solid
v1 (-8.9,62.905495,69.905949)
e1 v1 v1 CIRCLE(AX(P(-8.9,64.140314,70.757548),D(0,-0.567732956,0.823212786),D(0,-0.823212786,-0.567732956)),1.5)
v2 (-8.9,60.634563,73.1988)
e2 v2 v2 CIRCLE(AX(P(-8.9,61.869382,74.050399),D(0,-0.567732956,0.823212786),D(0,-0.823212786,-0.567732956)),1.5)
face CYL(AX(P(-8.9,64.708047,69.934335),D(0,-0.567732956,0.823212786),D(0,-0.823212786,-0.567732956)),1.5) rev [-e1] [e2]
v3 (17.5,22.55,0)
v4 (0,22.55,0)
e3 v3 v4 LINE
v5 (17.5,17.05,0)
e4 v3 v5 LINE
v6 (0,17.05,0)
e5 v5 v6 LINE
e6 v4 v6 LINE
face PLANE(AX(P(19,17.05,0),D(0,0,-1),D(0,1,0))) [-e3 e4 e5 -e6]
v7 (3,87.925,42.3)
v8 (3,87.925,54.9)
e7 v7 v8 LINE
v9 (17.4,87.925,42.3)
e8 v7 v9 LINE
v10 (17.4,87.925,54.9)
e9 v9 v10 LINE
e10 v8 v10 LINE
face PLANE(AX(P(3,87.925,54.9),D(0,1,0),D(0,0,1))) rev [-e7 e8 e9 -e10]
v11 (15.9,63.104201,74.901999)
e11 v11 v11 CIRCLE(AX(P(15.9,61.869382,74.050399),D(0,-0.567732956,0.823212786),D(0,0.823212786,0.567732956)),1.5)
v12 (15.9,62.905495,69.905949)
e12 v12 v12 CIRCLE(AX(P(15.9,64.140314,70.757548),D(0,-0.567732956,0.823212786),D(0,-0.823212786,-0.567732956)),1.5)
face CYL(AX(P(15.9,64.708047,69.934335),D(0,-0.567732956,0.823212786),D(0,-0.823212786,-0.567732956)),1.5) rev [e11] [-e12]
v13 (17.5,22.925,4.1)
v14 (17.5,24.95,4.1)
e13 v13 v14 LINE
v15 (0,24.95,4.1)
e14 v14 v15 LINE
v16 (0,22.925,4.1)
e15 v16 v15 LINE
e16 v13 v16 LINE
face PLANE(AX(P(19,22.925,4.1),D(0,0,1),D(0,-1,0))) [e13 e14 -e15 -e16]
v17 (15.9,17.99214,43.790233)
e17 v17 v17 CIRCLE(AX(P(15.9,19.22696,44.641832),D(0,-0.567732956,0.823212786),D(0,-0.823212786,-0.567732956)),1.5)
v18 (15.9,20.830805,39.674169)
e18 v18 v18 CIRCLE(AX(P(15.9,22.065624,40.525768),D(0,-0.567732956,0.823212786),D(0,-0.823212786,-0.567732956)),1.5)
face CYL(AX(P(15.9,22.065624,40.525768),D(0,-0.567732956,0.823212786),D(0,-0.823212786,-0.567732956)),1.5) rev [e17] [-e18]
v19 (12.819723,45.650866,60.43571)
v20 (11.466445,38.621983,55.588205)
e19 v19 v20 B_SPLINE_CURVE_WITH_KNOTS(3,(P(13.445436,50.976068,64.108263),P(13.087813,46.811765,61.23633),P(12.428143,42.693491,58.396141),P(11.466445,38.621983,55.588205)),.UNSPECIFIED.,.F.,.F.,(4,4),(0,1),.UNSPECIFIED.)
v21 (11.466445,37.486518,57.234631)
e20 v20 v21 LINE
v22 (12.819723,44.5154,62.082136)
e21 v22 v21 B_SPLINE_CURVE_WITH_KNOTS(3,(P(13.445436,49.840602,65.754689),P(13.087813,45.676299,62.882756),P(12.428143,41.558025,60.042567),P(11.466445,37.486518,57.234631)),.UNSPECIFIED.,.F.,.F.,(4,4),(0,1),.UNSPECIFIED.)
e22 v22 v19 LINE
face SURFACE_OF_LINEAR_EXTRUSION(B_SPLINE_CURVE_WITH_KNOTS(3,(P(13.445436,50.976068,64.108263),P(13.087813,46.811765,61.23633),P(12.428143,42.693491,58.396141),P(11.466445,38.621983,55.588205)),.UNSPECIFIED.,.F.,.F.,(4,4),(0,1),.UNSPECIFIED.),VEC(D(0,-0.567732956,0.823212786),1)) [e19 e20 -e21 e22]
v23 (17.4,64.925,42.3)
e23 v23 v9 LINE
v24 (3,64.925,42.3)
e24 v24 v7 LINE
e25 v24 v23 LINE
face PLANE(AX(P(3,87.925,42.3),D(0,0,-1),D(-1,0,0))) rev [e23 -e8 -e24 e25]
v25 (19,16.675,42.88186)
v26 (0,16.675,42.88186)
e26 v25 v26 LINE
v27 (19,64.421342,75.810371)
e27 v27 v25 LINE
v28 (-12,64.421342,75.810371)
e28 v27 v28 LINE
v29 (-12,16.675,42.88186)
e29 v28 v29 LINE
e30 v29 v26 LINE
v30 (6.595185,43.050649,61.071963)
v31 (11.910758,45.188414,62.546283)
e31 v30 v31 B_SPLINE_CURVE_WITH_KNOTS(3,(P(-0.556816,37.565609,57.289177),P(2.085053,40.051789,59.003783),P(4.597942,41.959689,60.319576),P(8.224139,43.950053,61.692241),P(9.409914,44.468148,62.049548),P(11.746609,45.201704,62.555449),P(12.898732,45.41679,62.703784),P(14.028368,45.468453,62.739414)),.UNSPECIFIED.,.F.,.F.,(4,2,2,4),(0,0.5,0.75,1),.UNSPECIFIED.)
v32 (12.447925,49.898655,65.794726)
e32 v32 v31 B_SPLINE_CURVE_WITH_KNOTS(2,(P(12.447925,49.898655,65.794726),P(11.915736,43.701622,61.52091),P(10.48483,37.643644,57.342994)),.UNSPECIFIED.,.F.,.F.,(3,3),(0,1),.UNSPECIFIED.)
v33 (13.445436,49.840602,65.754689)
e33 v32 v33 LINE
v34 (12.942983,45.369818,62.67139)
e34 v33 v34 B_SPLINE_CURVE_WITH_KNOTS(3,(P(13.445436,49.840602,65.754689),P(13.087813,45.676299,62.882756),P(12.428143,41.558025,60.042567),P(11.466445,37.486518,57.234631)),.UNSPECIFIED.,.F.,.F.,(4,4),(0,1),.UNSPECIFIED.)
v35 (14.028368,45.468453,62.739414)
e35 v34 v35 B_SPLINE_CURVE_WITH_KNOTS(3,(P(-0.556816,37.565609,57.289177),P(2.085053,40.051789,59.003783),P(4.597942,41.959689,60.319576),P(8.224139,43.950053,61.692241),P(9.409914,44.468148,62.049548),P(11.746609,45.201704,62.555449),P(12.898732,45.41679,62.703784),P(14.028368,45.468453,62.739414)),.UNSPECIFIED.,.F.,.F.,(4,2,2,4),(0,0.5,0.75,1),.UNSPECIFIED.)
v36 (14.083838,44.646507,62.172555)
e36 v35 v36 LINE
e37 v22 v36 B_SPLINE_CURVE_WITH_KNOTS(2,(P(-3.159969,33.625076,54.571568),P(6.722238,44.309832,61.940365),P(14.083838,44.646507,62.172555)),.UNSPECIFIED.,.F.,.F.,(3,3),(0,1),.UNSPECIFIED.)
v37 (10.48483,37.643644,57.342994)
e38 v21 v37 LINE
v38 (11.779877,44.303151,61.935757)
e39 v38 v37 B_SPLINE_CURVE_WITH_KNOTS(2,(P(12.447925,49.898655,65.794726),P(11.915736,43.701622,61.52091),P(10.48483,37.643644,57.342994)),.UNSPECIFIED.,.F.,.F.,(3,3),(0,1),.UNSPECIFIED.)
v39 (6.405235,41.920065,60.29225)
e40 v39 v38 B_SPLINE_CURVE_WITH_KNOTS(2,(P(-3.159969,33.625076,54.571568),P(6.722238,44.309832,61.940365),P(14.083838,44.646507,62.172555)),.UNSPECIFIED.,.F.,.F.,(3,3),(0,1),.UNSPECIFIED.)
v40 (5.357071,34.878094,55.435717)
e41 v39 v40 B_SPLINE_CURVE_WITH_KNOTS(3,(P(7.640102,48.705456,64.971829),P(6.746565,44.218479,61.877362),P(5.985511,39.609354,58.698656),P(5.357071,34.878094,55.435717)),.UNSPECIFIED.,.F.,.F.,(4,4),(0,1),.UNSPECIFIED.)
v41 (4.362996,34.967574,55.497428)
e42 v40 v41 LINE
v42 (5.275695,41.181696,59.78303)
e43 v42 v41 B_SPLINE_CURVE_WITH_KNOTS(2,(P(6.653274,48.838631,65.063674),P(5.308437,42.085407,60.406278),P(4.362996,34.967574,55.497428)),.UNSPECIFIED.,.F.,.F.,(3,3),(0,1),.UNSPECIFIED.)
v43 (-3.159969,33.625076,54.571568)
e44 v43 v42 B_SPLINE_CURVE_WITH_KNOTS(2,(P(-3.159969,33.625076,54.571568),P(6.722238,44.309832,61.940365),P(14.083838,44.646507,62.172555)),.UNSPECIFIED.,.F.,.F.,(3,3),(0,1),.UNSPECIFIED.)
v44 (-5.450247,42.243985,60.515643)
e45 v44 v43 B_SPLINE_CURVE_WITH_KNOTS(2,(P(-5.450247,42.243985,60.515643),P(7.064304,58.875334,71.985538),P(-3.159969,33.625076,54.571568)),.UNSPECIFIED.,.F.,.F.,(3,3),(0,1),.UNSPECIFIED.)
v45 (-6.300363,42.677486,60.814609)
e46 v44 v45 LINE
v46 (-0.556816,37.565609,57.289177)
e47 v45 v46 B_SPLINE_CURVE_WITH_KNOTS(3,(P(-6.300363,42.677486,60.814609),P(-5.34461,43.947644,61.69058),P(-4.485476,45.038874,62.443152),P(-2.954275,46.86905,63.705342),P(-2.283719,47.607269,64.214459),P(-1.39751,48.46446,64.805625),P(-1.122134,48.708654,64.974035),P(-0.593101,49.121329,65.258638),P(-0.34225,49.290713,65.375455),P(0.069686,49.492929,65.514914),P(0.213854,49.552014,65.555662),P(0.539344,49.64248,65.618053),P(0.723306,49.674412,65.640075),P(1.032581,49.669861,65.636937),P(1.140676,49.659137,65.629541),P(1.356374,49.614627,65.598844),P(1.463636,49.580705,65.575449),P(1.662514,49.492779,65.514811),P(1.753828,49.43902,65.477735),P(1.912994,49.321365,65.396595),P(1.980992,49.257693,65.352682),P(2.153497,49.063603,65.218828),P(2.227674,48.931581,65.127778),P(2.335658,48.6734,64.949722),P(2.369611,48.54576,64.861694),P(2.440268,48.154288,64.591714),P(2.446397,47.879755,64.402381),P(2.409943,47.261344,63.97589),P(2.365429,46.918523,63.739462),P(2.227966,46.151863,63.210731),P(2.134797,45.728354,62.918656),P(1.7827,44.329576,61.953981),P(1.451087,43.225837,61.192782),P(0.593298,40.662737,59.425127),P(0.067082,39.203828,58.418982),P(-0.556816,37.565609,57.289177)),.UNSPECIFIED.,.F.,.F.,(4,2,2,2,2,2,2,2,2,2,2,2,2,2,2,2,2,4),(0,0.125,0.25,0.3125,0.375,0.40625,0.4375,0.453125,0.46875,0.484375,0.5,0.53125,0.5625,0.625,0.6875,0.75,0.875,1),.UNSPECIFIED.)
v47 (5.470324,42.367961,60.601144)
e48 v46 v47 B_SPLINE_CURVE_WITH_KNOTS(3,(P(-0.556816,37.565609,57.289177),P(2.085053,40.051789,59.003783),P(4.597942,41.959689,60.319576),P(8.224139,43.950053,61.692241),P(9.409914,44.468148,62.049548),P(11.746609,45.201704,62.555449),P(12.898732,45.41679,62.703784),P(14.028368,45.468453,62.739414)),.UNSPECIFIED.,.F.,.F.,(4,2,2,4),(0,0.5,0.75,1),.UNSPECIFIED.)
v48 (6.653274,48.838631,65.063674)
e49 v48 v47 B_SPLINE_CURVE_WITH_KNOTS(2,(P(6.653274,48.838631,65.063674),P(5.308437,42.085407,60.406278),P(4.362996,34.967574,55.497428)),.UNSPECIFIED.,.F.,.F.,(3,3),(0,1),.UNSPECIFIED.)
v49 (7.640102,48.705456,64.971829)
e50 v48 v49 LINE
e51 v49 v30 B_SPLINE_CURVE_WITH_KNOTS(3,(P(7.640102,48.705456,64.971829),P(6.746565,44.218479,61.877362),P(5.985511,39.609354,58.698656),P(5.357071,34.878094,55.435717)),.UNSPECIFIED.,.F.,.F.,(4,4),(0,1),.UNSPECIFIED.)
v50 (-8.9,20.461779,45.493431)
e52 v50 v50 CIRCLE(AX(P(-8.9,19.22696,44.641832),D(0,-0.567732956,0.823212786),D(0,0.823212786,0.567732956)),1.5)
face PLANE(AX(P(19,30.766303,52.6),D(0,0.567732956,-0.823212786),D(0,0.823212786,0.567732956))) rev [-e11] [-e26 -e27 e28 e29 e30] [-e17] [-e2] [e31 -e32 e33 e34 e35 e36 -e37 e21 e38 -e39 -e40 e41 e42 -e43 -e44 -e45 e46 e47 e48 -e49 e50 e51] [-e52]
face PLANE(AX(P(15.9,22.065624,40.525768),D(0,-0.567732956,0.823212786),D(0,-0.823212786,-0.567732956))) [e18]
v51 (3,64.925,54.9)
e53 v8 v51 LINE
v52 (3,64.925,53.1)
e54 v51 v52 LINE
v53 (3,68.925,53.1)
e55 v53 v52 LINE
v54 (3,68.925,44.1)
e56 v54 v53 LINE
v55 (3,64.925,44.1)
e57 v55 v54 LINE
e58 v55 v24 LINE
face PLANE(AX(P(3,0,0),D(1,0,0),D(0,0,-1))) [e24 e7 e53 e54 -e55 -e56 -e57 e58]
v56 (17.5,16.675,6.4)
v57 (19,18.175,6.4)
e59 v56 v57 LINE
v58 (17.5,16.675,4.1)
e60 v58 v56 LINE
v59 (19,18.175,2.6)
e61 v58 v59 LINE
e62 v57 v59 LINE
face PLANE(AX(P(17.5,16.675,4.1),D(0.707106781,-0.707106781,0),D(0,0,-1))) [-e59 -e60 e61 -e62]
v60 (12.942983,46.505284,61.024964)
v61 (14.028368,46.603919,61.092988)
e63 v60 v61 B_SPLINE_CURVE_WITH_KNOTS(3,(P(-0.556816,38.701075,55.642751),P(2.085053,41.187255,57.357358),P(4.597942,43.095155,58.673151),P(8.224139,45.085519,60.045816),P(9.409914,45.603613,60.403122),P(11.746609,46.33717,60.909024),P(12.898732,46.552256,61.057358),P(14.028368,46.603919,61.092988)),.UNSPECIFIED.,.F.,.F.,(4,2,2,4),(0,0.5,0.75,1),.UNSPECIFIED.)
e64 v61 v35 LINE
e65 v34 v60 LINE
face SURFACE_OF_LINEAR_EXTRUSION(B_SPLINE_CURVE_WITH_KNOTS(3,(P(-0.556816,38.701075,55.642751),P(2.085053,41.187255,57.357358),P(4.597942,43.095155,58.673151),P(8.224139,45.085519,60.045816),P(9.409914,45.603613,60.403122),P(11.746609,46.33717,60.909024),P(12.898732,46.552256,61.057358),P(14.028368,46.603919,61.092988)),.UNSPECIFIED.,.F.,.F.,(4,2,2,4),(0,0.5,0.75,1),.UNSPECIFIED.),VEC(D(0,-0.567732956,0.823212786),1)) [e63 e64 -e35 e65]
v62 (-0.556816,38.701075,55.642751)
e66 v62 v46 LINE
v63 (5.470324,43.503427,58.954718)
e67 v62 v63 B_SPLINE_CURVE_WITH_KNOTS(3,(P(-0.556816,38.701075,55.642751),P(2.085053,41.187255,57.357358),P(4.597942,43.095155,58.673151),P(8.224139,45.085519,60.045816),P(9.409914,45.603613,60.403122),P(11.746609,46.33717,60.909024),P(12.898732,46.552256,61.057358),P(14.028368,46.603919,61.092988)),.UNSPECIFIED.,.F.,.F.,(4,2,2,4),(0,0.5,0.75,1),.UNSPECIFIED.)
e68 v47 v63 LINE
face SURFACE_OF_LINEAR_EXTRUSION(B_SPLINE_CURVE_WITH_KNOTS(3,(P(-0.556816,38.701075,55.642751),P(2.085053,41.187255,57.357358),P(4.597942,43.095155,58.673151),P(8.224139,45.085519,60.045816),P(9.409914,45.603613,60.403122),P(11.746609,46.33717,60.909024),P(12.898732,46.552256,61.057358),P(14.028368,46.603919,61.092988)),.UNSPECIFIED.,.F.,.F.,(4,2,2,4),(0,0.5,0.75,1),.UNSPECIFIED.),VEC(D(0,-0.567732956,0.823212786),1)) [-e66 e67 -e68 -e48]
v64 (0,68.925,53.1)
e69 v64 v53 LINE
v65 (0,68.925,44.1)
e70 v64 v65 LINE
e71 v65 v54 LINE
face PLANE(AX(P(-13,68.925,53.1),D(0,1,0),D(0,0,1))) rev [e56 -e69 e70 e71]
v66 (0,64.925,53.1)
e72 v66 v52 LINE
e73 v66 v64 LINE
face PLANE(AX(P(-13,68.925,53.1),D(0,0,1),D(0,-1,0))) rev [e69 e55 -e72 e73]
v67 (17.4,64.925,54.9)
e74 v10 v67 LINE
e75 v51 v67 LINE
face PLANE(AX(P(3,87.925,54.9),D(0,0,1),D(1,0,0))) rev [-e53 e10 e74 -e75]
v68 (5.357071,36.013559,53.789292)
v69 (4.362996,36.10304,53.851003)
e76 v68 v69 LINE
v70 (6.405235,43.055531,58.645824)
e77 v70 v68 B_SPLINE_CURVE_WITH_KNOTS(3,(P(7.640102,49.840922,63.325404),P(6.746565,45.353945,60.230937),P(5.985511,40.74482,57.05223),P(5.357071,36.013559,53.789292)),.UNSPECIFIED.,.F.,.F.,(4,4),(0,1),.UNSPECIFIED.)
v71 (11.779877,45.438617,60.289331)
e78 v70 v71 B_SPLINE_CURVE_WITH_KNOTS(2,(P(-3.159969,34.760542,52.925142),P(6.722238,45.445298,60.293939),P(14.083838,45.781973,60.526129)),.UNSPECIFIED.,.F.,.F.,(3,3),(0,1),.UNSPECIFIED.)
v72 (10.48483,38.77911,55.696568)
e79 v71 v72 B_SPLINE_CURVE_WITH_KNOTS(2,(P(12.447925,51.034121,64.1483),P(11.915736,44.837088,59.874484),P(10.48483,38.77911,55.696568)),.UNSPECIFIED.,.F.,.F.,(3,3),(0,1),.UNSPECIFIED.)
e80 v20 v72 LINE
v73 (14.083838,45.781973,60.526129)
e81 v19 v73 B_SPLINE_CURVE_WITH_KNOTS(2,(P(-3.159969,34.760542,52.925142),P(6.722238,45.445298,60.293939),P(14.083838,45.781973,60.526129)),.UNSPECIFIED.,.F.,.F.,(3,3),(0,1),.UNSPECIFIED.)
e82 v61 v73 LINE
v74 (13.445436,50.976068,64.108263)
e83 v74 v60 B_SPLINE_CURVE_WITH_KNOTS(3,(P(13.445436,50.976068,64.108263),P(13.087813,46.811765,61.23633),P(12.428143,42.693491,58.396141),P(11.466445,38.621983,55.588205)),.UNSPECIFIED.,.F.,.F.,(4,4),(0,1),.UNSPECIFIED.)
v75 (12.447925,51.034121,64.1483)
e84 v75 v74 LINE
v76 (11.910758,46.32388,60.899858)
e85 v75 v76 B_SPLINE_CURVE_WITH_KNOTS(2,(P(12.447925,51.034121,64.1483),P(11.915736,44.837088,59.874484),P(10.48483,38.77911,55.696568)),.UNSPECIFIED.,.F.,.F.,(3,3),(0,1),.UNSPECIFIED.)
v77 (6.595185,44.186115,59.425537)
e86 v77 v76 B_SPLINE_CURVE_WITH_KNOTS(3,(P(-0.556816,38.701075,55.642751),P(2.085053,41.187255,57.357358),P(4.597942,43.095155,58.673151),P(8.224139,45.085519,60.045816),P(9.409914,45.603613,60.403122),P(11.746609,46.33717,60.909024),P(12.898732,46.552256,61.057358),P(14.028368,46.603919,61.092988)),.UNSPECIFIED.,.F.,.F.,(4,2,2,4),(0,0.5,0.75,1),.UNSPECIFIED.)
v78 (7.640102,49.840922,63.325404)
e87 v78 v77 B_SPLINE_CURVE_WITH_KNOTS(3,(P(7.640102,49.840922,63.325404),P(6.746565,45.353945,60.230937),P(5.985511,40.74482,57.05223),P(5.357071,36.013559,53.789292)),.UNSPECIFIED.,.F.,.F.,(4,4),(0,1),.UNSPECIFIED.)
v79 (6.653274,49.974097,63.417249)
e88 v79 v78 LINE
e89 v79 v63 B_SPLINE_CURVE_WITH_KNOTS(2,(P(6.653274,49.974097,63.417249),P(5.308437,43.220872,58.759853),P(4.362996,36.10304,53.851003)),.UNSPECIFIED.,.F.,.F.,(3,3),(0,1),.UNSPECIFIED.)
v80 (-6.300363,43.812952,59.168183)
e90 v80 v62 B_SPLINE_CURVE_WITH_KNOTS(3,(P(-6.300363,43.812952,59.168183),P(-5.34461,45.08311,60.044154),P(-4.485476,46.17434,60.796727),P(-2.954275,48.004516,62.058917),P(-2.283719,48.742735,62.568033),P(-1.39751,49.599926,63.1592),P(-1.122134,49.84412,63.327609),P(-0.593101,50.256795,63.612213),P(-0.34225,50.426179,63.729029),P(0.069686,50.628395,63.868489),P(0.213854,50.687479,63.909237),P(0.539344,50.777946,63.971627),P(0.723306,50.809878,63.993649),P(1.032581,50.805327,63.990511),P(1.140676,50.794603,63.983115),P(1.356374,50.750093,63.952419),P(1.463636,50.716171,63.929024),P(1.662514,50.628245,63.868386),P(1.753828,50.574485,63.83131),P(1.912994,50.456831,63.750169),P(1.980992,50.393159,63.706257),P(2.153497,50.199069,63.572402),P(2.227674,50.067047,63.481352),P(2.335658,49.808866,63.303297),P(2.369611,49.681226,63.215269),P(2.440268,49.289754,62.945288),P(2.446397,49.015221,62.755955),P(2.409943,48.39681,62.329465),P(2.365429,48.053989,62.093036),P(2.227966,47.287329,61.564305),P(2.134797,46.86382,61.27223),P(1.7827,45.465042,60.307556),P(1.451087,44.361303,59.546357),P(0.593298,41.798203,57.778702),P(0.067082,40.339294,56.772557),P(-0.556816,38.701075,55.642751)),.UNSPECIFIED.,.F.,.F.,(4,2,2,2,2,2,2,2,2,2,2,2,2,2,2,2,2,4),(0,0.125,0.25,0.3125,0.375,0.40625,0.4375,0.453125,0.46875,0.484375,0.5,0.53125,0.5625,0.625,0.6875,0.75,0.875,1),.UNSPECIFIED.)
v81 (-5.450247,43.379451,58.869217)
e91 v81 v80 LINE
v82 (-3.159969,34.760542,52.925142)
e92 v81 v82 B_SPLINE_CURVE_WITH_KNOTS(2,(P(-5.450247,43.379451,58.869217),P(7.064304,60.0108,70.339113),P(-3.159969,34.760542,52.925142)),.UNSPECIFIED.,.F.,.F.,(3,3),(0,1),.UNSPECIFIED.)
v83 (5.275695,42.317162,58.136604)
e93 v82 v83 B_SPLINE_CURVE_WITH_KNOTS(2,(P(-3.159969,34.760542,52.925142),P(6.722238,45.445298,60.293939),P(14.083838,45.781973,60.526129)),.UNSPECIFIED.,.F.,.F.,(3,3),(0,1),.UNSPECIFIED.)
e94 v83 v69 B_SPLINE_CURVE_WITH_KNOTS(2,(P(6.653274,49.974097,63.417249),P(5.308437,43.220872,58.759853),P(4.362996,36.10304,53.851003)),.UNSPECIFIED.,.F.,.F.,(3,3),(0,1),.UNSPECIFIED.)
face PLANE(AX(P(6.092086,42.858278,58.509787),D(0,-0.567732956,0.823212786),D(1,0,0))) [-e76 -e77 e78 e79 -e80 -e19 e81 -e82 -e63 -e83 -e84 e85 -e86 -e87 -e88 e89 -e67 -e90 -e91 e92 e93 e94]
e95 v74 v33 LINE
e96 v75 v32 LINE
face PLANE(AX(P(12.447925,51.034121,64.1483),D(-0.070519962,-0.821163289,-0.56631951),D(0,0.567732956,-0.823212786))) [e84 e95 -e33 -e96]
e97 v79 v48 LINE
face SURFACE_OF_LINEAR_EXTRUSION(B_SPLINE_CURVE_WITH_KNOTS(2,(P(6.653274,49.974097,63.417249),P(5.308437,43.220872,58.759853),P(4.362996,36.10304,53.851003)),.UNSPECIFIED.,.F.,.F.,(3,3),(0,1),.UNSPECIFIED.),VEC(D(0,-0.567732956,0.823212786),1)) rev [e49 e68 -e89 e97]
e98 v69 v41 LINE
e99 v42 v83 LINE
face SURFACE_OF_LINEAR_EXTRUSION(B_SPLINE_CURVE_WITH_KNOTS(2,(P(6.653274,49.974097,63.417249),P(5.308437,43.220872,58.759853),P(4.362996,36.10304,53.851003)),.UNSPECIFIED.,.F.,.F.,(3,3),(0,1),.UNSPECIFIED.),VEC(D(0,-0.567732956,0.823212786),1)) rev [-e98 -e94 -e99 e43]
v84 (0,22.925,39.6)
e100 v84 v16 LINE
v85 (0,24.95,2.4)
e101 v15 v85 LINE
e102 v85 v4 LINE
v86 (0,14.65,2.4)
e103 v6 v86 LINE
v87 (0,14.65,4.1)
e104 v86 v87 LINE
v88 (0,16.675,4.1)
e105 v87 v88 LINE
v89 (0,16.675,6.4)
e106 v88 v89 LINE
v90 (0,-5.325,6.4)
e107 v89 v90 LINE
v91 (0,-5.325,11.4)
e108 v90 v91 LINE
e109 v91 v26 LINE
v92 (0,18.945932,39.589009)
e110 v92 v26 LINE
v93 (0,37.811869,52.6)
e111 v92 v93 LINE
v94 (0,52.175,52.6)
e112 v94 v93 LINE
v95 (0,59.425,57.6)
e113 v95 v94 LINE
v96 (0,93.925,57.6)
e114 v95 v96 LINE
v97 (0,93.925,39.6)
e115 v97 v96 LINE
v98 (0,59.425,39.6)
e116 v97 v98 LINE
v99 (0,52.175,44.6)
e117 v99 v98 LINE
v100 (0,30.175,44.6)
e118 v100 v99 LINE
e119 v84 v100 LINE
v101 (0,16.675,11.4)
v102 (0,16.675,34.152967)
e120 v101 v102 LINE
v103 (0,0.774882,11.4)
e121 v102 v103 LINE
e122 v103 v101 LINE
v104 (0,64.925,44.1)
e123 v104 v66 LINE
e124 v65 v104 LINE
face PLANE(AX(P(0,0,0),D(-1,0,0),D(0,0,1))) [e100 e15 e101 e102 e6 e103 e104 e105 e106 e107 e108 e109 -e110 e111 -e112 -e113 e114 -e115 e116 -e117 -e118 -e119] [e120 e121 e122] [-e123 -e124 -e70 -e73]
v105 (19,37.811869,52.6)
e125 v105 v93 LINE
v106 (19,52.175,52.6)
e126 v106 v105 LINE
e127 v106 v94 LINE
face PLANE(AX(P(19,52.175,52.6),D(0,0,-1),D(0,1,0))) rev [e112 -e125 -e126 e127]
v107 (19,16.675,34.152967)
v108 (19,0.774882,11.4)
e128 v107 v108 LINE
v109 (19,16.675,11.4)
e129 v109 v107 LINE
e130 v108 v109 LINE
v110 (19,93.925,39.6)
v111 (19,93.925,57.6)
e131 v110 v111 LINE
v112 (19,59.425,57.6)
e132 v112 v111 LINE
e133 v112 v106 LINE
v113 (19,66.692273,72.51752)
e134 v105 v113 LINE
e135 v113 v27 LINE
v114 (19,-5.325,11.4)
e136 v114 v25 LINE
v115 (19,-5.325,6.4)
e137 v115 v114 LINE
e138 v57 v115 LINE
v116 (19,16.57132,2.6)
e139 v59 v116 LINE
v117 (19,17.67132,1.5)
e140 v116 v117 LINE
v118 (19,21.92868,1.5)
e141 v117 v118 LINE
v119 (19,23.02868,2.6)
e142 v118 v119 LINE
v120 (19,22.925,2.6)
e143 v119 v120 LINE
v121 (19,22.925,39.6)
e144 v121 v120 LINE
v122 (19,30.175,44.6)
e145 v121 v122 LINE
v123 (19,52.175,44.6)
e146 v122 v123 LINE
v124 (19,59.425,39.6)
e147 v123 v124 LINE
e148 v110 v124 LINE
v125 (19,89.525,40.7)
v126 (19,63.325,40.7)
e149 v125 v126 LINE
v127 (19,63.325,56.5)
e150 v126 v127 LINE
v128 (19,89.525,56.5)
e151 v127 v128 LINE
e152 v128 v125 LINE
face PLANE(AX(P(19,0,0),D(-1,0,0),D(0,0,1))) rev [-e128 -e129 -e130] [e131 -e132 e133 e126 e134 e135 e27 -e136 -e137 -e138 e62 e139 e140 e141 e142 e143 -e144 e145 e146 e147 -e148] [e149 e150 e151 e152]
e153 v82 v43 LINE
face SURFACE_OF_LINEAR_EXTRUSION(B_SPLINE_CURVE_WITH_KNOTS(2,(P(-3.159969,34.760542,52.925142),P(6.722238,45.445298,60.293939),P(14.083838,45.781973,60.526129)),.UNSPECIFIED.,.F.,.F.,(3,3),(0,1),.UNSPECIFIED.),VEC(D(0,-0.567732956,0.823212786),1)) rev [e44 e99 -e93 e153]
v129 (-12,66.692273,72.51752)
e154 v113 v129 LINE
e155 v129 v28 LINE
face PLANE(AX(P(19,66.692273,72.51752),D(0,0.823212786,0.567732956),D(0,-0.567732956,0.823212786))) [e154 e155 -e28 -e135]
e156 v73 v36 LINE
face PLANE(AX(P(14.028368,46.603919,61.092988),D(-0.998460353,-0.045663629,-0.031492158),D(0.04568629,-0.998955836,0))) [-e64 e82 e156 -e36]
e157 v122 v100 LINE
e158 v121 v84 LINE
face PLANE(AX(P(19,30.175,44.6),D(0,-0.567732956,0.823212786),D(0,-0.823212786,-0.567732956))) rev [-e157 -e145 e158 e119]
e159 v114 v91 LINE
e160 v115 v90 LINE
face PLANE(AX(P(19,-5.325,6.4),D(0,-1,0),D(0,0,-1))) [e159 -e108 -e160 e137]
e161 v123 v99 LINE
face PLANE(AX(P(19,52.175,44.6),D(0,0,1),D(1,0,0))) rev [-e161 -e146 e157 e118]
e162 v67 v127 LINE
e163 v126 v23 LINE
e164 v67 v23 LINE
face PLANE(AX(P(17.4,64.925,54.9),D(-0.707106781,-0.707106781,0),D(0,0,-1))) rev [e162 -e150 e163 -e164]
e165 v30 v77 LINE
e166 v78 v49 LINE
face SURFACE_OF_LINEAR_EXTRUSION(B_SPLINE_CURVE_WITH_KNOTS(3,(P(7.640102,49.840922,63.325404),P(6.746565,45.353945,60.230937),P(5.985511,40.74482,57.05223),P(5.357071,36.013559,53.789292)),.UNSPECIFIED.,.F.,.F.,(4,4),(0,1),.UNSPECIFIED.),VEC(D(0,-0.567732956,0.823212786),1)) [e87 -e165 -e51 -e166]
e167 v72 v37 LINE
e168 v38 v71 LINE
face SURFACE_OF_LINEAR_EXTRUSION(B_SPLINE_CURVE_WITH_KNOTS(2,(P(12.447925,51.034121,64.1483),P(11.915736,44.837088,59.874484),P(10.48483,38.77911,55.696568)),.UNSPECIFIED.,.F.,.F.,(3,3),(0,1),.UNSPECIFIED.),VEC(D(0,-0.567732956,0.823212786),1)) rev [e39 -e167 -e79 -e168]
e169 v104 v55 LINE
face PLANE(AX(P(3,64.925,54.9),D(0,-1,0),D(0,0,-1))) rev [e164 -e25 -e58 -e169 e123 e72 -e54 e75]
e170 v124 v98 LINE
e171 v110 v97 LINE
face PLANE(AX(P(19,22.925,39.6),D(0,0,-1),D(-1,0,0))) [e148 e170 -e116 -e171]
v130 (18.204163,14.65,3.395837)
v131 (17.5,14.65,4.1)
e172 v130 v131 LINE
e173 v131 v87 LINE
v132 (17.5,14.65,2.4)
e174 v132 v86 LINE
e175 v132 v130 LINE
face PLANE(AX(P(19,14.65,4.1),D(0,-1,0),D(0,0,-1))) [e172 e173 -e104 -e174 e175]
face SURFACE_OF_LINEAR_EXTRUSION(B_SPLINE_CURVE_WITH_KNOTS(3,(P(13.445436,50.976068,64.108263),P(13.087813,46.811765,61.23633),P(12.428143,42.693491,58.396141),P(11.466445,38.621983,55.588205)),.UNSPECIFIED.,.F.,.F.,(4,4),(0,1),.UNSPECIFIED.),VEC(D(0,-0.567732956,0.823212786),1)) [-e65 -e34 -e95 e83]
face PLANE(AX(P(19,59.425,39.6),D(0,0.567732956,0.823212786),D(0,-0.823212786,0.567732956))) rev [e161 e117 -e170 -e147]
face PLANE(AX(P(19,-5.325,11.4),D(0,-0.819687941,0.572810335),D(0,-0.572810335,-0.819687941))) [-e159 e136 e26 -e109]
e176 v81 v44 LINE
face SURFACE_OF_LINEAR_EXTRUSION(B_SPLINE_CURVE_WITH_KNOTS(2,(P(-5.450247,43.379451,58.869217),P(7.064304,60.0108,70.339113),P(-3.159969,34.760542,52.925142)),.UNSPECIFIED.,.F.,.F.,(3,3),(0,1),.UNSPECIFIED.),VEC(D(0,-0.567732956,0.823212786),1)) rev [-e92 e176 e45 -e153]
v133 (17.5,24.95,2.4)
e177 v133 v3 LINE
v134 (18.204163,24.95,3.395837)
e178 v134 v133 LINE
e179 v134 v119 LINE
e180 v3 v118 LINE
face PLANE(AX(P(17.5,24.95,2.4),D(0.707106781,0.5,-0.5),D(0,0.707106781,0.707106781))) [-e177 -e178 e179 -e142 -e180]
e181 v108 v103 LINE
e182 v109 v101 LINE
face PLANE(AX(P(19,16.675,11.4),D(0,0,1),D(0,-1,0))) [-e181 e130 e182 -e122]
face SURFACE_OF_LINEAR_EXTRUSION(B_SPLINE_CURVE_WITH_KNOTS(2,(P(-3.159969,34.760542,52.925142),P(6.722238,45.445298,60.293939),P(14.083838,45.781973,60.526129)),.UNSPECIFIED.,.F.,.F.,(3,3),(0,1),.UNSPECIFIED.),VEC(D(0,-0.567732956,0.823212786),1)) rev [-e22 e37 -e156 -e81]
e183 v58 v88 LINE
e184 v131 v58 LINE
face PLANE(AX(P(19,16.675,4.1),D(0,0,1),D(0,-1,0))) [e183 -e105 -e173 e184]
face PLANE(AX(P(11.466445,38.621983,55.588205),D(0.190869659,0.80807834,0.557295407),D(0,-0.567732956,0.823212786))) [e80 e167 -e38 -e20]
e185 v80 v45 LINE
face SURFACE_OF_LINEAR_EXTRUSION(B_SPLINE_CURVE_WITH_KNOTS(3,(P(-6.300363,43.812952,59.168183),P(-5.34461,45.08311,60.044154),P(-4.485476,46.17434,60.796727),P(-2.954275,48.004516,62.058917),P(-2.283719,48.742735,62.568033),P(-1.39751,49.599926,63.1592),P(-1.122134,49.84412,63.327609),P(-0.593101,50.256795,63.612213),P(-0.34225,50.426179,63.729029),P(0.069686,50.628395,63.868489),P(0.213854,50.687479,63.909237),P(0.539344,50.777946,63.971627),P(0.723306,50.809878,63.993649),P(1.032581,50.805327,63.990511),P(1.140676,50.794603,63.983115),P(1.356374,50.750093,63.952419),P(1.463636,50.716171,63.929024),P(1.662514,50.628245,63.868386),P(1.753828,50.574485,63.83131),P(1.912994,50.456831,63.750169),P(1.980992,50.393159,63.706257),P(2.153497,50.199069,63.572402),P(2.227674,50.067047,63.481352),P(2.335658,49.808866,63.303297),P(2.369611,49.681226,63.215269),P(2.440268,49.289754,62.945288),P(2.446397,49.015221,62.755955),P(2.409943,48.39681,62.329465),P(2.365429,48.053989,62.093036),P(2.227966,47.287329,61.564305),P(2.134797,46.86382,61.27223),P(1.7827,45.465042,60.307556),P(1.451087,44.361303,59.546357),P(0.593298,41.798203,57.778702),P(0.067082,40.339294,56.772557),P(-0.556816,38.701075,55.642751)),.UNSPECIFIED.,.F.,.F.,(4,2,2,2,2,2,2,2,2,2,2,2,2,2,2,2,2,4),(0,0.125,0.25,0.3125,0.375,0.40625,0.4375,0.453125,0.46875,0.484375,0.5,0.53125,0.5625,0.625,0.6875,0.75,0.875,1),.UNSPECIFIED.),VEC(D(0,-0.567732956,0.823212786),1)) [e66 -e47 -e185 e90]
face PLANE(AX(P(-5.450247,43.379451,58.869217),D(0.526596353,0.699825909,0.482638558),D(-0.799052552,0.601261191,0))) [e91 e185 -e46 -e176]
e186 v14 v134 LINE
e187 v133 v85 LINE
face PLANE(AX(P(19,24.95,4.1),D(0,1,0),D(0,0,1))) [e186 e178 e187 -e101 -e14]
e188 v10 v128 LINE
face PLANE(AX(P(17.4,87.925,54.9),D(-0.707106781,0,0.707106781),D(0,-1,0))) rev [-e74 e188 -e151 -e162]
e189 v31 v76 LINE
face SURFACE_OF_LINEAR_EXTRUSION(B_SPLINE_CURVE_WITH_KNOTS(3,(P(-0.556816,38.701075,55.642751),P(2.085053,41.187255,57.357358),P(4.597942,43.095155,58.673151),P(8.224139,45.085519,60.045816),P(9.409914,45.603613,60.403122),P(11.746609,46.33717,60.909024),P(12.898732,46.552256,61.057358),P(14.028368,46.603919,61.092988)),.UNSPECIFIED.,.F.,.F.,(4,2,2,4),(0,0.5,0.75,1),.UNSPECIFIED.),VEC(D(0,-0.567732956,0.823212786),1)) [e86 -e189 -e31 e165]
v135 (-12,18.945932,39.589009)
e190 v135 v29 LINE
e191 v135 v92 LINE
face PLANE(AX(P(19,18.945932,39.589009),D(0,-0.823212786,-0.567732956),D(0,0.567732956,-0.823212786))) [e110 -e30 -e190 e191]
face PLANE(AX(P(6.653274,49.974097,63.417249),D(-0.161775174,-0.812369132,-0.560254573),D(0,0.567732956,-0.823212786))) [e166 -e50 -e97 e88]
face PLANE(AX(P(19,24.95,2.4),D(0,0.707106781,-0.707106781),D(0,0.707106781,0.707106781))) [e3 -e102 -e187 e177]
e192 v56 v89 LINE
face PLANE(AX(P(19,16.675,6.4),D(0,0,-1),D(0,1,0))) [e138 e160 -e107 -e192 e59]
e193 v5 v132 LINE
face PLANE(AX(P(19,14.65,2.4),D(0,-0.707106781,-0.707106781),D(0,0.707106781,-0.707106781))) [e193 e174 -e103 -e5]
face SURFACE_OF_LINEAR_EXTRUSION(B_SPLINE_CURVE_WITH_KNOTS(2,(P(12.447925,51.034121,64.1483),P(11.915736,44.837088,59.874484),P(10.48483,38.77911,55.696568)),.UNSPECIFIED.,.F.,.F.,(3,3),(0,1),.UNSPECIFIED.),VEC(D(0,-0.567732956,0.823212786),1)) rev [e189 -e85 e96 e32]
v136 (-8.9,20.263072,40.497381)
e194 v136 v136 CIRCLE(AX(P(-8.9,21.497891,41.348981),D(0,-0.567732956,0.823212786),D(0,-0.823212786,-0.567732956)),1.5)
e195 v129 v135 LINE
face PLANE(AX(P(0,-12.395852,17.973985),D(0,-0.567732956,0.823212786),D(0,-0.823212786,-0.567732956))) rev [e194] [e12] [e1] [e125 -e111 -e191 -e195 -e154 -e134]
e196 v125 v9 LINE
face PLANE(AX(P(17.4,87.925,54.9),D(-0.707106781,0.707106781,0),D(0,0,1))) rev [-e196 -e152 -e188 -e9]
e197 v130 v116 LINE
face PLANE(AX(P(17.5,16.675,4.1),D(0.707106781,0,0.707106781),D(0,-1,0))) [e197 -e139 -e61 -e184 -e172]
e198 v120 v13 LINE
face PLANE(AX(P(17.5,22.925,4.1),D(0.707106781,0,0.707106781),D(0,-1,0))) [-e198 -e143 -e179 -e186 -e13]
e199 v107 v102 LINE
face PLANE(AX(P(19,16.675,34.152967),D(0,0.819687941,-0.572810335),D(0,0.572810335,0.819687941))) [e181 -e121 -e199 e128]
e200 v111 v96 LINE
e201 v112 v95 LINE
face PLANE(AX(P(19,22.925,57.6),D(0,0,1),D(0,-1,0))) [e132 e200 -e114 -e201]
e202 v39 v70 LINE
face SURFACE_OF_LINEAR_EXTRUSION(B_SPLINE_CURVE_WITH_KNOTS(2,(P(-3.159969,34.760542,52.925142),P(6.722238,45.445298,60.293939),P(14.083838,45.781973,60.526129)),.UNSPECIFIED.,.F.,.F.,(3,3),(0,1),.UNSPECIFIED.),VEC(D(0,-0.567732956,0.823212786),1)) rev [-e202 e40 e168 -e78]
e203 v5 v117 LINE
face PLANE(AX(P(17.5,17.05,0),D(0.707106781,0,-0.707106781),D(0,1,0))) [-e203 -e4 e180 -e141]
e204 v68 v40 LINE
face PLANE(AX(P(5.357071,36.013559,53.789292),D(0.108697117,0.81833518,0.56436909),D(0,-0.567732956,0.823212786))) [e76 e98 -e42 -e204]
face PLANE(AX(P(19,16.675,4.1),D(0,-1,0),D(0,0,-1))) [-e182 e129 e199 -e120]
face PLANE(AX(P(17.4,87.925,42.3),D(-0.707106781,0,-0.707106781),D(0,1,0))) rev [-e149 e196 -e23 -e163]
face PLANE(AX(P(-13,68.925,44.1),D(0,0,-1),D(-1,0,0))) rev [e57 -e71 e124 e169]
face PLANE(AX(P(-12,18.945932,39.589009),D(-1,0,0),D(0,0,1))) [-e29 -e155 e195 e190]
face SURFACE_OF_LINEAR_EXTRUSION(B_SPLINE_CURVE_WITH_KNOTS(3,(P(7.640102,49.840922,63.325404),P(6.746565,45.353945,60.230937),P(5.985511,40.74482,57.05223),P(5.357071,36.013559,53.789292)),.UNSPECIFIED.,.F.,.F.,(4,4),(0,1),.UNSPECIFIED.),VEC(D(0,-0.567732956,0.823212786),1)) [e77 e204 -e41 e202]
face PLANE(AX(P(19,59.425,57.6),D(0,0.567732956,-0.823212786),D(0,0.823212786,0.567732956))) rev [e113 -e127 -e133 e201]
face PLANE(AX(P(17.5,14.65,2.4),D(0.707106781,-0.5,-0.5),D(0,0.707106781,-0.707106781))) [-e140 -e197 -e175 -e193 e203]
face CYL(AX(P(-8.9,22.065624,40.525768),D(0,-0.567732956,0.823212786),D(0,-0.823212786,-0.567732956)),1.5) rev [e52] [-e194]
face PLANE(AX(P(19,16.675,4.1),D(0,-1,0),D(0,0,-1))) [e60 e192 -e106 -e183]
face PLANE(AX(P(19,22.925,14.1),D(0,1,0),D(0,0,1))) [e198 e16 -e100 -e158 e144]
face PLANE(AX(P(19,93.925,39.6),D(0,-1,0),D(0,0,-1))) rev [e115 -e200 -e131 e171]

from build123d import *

# Parameters (mm, degrees)
BOSS_EXTRUDE1_DEPTH     = 19
SKETCH3_W               = 5.025645198
SKETCH3_H               = 33.799871634
BOSS_EXTRUDE2_DEPTH     = 19
SKETCH4_W               = 5.025645198
SKETCH4_H               = 7.749871634
CUT_EXTRUDE1_DEPTH      = 41.8379487
SKETCH5_W               = 11.025645198
SKETCH5_H               = 26.05
CUT_EXTRUDE3_DEPTH      = 37.732721166
SKETCH6_W               = 40.5
SKETCH6_H               = 6.25
BOSS_EXTRUDE3_DEPTH     = 19
SKETCH7_W               = 18
SKETCH7_H               = 64
BOSS_EXTRUDE4_DEPTH     = 19
BOSS_EXTRUDE5_DEPTH     = 19
SKETCH10_W              = 12.6
SKETCH10_H              = 23
CUT_EXTRUDE4_DEPTH      = 16
BOSS_EXTRUDE7_DEPTH     = 19
CUT_EXTRUDE6_DEPTH      = 106.993941454
CUT_EXTRUDE7_DEPTH      = 106.993941454
SKETCH20_W              = 9.1
SKETCH20_H              = 10.3
CUT_EXTRUDE10_DEPTH     = 106.993941454
SKETCH21_W              = 5
SKETCH21_H              = 22
BOSS_EXTRUDE8_DEPTH     = 19
SKETCH23_W              = 19
SKETCH23_H              = 18
BOSS_EXTRUDE9_DEPTH     = 2
CHAMFER1_SIZE           = 1.5
SKETCH24_W              = 9
SKETCH24_H              = 4
CUT_EXTRUDE12_DEPTH     = 108.151367817
CUT_EXTRUDE13_DEPTH     = 108.640213791
BOSS_EXTRUDE10_DEPTH    = 19
SKETCH29_W              = 19
SKETCH29_H              = 18
BOSS_EXTRUDE11_DEPTH    = 10
SKETCH30_W              = 12.6
SKETCH30_H              = 23
BOSS_EXTRUDE12_DEPTH    = 19
SKETCH34_W              = 18
SKETCH34_H              = 5
CUT_EXTRUDE16_DEPTH     = 117.038423055
SKETCH36_W              = 31
SKETCH36_H              = 58
BOSS_EXTRUDE13_DEPTH    = 4
SKETCH37_R              = 1.5
CUT_EXTRUDE17_DEPTH     = 5
CUT_EXTRUDE_THIN1_START = -2
CUT_EXTRUDE_THIN1_DEPTH = 2
SKETCH40_W              = 12.6
SKETCH40_H              = 23
CUT_EXTRUDE18_DEPTH     = 16
SKETCH41_W              = 9
SKETCH41_H              = 4
CUT_EXTRUDE19_DEPTH     = 16
CHAMFER2_SIZE           = 1.6


# Read off the part's stored shape, not the designer's step: Cut-Extrude-Thin1
with BuildPart() as part:
    # Sketch2 → Boss-Extrude1 (new body)
    with BuildSketch(Plane(origin=(0, 0, 0), x_dir=(0, 0, -1), z_dir=(1, 0, 0))):
        Polygon((-4.1, 3.125), (-14.1, 3.125), (-14.1, -3.125), (-4.1, -3.125), (-4.1, -5.15), (-2.4, -5.15), (0, -2.75), (0, 2.75), (-2.4, 5.15), (-4.1, 5.15), align=None)
    boss_extrude1 = extrude(amount=BOSS_EXTRUDE1_DEPTH)

    # Sketch3 → Boss-Extrude2 (add)
    with BuildSketch(Plane.ZY):
        with Locations((16.612822599, 13.774935817)):
            Rectangle(SKETCH3_W, SKETCH3_H)
    extrude(amount=-BOSS_EXTRUDE2_DEPTH)

    # Mirror2: Boss-Extrude1 across plane
    add(boss_extrude1.mirror(Plane.ZX.offset(9.9)))

    # Sketch4 → Cut-Extrude1 (cut, through all)
    with BuildSketch(Plane.ZY):
        with Locations((16.612822599, 26.799935817)):
            Rectangle(SKETCH4_W, SKETCH4_H)
    extrude(amount=-CUT_EXTRUDE1_DEPTH, mode=Mode.SUBTRACT)

    # Sketch5 → Cut-Extrude3 (cut, through all)
    with BuildSketch(Plane(origin=(19, 0, 0), x_dir=(0, 0, -1), z_dir=(1, 0, 0))):
        with Locations((-13.612822599, 9.9)):
            Rectangle(SKETCH5_W, SKETCH5_H)
    extrude(amount=-CUT_EXTRUDE3_DEPTH, mode=Mode.SUBTRACT)


with BuildPart() as cut_extrude3_piece_1:
    # of the separate pieces the step leaves, piece 1, a body of its own (cut_extrude3_pieces)
    add(part.part.solids().sort_by_distance((0, 16.675, 8.1))[0])



with BuildPart() as cut_extrude3_piece_2:
    # of the separate pieces the step leaves, piece 2, a body of its own (cut_extrude3_pieces)
    add(part.part.solids().sort_by_distance((0, 3.125, 4.1))[0])


with BuildPart() as cut_extrude3_piece_1_1:
    add(cut_extrude3_piece_1.part)

    add(cut_extrude3_piece_2.part)  # Boss-Extrude3 merges Cut-Extrude3 piece 2
    # Sketch6 → Boss-Extrude3 (add)
    with BuildSketch(Plane(origin=(19, 0, 0), x_dir=(0, 0, -1), z_dir=(1, 0, 0))):
        Polygon((-35.815909091, 16.675), (-48.6, 16.675), (-8.1, -3.125), (-8.1, 3.125), align=None)
        with Locations((-28.35, 19.8)):
            Rectangle(SKETCH6_W, SKETCH6_H)
    extrude(amount=-BOSS_EXTRUDE3_DEPTH)

    # Sketch7 → Boss-Extrude4 (add)
    with BuildSketch(Plane.ZY):
        with Locations((48.6, 54.925)):
            Rectangle(SKETCH7_W, SKETCH7_H)
    extrude(amount=-BOSS_EXTRUDE4_DEPTH)

    # Sketch9 → Boss-Extrude5 (add)
    with BuildSketch(Plane.ZY):
        Polygon((57.6, 22.925), (48.6, 22.925), (48.6, 16.675), align=None)
    extrude(amount=-BOSS_EXTRUDE5_DEPTH)

    # Sketch10 → Cut-Extrude4 (cut)
    with BuildSketch(Plane.ZY):
        with Locations((48.6, 74.425)):
            Rectangle(SKETCH10_W, SKETCH10_H)
    extrude(amount=-CUT_EXTRUDE4_DEPTH, mode=Mode.SUBTRACT)

    # Sketch13 → Boss-Extrude7 (add)
    with BuildSketch(Plane.ZY):
        Polygon((9.1, 16.675), (9.1, 3.613888889), (35.815909091, 16.675), align=None)
    extrude(amount=-BOSS_EXTRUDE7_DEPTH)

    # Sketch14 → Cut-Extrude6 (cut, through all)
    with BuildSketch(Plane.ZY):
        Polygon((39.6, 59.425), (44.6, 52.175), (44.6, 30.175), (39.6, 22.925), align=None)
        Polygon((52.6, 30.175), (57.6, 22.925), (57.6, 59.425), (52.6, 52.175), align=None)
    extrude(amount=-CUT_EXTRUDE6_DEPTH, mode=Mode.SUBTRACT)

    # Sketch16 → Cut-Extrude7 (cut, through all)
    with BuildSketch(Plane(origin=(19, 0, 0), x_dir=(0, 0, -1), z_dir=(1, 0, 0))):
        Polygon((-8.1, -3.125), (-58.554154728, 21.541475645), (-57.6, 22.925), align=None)
    extrude(amount=-CUT_EXTRUDE7_DEPTH, mode=Mode.SUBTRACT)

    # Sketch20 → Cut-Extrude10 (cut, through all)
    with BuildSketch(Plane.ZY):
        Polygon((52.6, 16.675), (9.1, 16.675), (9.1, 5.15), (9.1, -5.15), (52.6, -5.15), align=None)
        with Locations((4.55, 0)):
            Rectangle(SKETCH20_W, SKETCH20_H)
    extrude(amount=-CUT_EXTRUDE10_DEPTH, mode=Mode.SUBTRACT)

    # Sketch21 → Boss-Extrude8 (add, through all)
    with BuildSketch(Plane.ZY):
        with Locations((8.9, 5.675)):
            Rectangle(SKETCH21_W, SKETCH21_H)
    extrude(amount=-BOSS_EXTRUDE8_DEPTH)

    # Sketch23 → Boss-Extrude9 (add)
    with BuildSketch(Plane(origin=(0, 86.925, 0), x_dir=(1, 0, 0), z_dir=(0, 1, 0))):
        with Locations((9.5, -48.6)):
            Rectangle(SKETCH23_W, SKETCH23_H)
    extrude(amount=BOSS_EXTRUDE9_DEPTH)

    # Chamfer1
    # the kernel refuses this chamfer: 1.5 mm, written as the material it takes off along each edge
    with BuildSketch(Plane(origin=(19, 10.792475518, 4.1), x_dir=(0.027495876610586775, 0, -0.9996219169112968), z_dir=(0, 1, 0)), Plane(origin=(19, 22.925, 4.1), x_dir=(0.027495876610586775, 0, -0.9996219169112968), z_dir=(0, 1, 0))) as chamfer1_piece_1:
        Polygon((CHAMFER1_SIZE * 0.999621916911, CHAMFER1_SIZE * 0.0274958766106), (-CHAMFER1_SIZE * 0.0274958766106, CHAMFER1_SIZE * 0.999621916911), (0, 0), align=None)
    extrude(amount=5.882524482, mode=Mode.SUBTRACT)
    with BuildSketch(Plane(origin=(19, 19.77768172, -2.72768172), x_dir=(0.027495876610586747, 0.7068394360706739, 0.7068394360706729), z_dir=(0, -0.707106781186547, 0.707106781186548)), Plane(origin=(19, 27.67768172, 5.12768172), x_dir=(0.027495876610586768, -0.7068394360706726, 0.7068394360706743), z_dir=(0, -0.7071067811865483, -0.7071067811865467))) as chamfer1_piece_2:
        Polygon((CHAMFER1_SIZE * 0.999621916911, CHAMFER1_SIZE * 0.0274958766106), (-CHAMFER1_SIZE * 0.0274958766106, CHAMFER1_SIZE * 0.999621916911), (0, 0), align=None)
    extrude(amount=11.109161514, mode=Mode.SUBTRACT)
    with BuildSketch(Plane(origin=(19, 26.407524482, 0), x_dir=(0.027495876610586778, 1.269416837651831e-15, 0.9996219169112968), z_dir=(0, -1, 0))) as chamfer1_piece_3:
        Polygon((CHAMFER1_SIZE * 0.999621916911, CHAMFER1_SIZE * 0.0274958766106), (-CHAMFER1_SIZE * 0.0274958766106, CHAMFER1_SIZE * 0.999621916911), (0, 0), align=None)
    extrude(amount=13.215048964, mode=Mode.SUBTRACT)
    with BuildSketch(Plane(origin=(19, 16.675, 4.1), x_dir=(0.027495876610586768, 0.9996219169112968, 0), z_dir=(0, 0, 1))) as chamfer1_piece_4:
        Polygon((CHAMFER1_SIZE * 0.999621916911, CHAMFER1_SIZE * 0.0274958766106), (-CHAMFER1_SIZE * 0.0274958766106, CHAMFER1_SIZE * 0.999621916911), (0, 0), align=None)
    extrude(amount=2.3, mode=Mode.SUBTRACT)
    with BuildSketch(Plane(origin=(19, 16.675, 0.242475518), x_dir=(0.027495876610586768, 0.9996219169112968, 0), z_dir=(0, 0, 1))) as chamfer1_piece_5a_section:
        Polygon((CHAMFER1_SIZE * 0.999621916911, CHAMFER1_SIZE * 0.0274958766106), (-CHAMFER1_SIZE * 0.0274958766106, CHAMFER1_SIZE * 0.999621916911), (0, 0), align=None)
    chamfer1_piece_5a = extrude(amount=6.157524482, mode=Mode.PRIVATE)
    chamfer1_piece_5a = split(chamfer1_piece_5a, bisect_by=Plane(origin=(18.50530956, 17.16969044, 4.1), z_dir=(0, 0, -1)), keep=Keep.TOP, mode=Mode.PRIVATE)
    with BuildSketch(Plane(origin=(19, 10.792475518, 4.1), x_dir=(0.027495876610586775, 0, -0.9996219169112968), z_dir=(0, 1, 0))) as chamfer1_piece_5b_section:
        Polygon((CHAMFER1_SIZE * 0.999621916911, CHAMFER1_SIZE * 0.0274958766106), (-CHAMFER1_SIZE * 0.0274958766106, CHAMFER1_SIZE * 0.999621916911), (0, 0), align=None)
    chamfer1_piece_5b = extrude(amount=9.740048964, mode=Mode.PRIVATE)
    chamfer1_piece_5b = split(chamfer1_piece_5b, bisect_by=Plane(origin=(18.50530956, 16.675, 3.60530956), z_dir=(0, 1, 0)), keep=Keep.TOP, mode=Mode.PRIVATE)
    chamfer1_piece_5 = chamfer1_piece_5a & chamfer1_piece_5b
    add(chamfer1_piece_5, mode=Mode.SUBTRACT)

    # Sketch24 → Cut-Extrude12 (cut, through all)
    with BuildSketch(Plane.ZY.offset(-16)):
        with Locations((48.6, 64.925)):
            Rectangle(SKETCH24_W, SKETCH24_H)
    extrude(amount=-CUT_EXTRUDE12_DEPTH, mode=Mode.SUBTRACT)

    # Sketch25 → Cut-Extrude13 (cut, through all)
    with BuildSketch(Plane.ZY):
        Polygon((52.6, 30.766303154), (42.881859894, 16.675), (45.723800384, 16.675), (57.6, 22.925), align=None)
    extrude(amount=-CUT_EXTRUDE13_DEPTH, mode=Mode.SUBTRACT)

    # Sketch28 → Boss-Extrude10 (add, through all)
    with BuildSketch(Plane.ZY):
        Polygon((11.4, -5.325), (42.881859894, 16.675), (34.152967104, 16.675), (11.4, 0.774882346), align=None)
    extrude(amount=-BOSS_EXTRUDE10_DEPTH)

    # Sketch29 → Boss-Extrude11 (add)
    with BuildSketch(Plane(origin=(0, 88.925, 0), x_dir=(1, 0, 0), z_dir=(0, 1, 0))):
        with Locations((9.5, -48.6)):
            Rectangle(SKETCH29_W, SKETCH29_H)
    extrude(amount=BOSS_EXTRUDE11_DEPTH)

    # Sketch30 → Boss-Extrude12 (add, through all)
    with BuildSketch(Plane.ZY):
        with Locations((48.6, 74.425)):
            Rectangle(SKETCH30_W, SKETCH30_H)
    extrude(amount=-BOSS_EXTRUDE12_DEPTH)

    # Sketch34 → Cut-Extrude16 (cut, through all)
    with BuildSketch(Plane.ZY):
        with Locations((48.6, 96.425)):
            Rectangle(SKETCH34_W, SKETCH34_H)
    extrude(amount=-CUT_EXTRUDE16_DEPTH, mode=Mode.SUBTRACT)

    # Sketch36 → Boss-Extrude13 (add)
    with BuildSketch(Plane(origin=(0, -14.666783834, 21.26683656), x_dir=(1, 0, 0), z_dir=(0, -0.5677329558036595, 0.8232127859153066))):
        with Locations((3.5, 67.072518273)):
            Rectangle(SKETCH36_W, SKETCH36_H)
    extrude(amount=-BOSS_EXTRUDE13_DEPTH)

    # Sketch37 → Cut-Extrude17 (cut)
    with BuildSketch(Plane(origin=(0, -14.666783834, 21.26683656), x_dir=(1, 0, 0), z_dir=(0, -0.5677329558036595, 0.8232127859153066))):
        with Locations(Location((-8.9, 92.972518273, 0), (0, 0, 270))):
            Circle(SKETCH37_R)
        with Locations(Location((15.9, 92.972518273, 0), (0, 0, 270))):
            Circle(SKETCH37_R)
        with Locations(Location((15.9, 41.172518273, 0), (0, 0, 270))):
            Circle(SKETCH37_R)
        with Locations(Location((-8.9, 41.172518273, 0), (0, 0, 270))):
            Circle(SKETCH37_R)
    extrude(amount=-CUT_EXTRUDE17_DEPTH, mode=Mode.SUBTRACT)

    # Cut-Extrude-Thin1 outline → Cut-Extrude-Thin1 (cut)
    with BuildSketch(Plane(origin=(0, -14.666783834, 21.26683656), x_dir=(1, 0, 0), z_dir=(0, -0.5677329558036595, 0.8232127859153066)).offset(CUT_EXTRUDE_THIN1_START)):
        with BuildLine():
            add(Edge.make_bspline(
                [(12.819722606, 71.891721205), (12.467350987, 69.027146263), (12.016257218, 66.18097235), (11.466444984, 63.353366575)],
                knots=[0.428290114, 0.428290114, 0.428290114, 0.428290114, 1, 1, 1, 1], degree=3))
            add(Edge.make_bspline(
                [(12.819722606, 71.891721205), (13.460807572, 72.01637124), (14.083838289, 72.050984058)],
                knots=[0.915367491, 0.915367491, 0.915367491, 1, 1, 1], degree=2))
            Line((14.083838289, 72.050984058), (14.028368269, 73.049444411))
            add(Edge.make_bspline(
                [(12.942983362, 72.929627931), (13.306922211, 72.989375516), (13.668784523, 73.029467536), (14.028368269, 73.049444411)],
                knots=[0.920420451, 0.920420451, 0.920420451, 0.920420451, 1, 1, 1, 1], degree=3))
            add(Edge.make_bspline(
                [(13.445435614, 78.360524964), (13.316943497, 76.542993923), (13.149459109, 74.732681085), (12.942983362, 72.929627931)],
                knots=[0, 0, 0, 0, 0.359295345, 0.359295345, 0.359295345, 0.359295345], degree=3))
            Line((13.445435614, 78.360524964), (12.447925246, 78.431044926))
            add(Edge.make_bspline(
                [(12.447925246, 78.431044926), (12.244802092, 75.557852039), (11.910758079, 72.709266295)],
                knots=[0, 0, 0, 0.38167443, 0.38167443, 0.38167443], degree=2))
            add(Edge.make_bspline(
                [(6.595184696, 70.112410703), (6.735581828, 70.2103088), (6.875653575, 70.305848913), (8.224138751, 71.204963789), (9.409914051, 71.834320858), (11.02491464, 72.450195671), (11.469196886, 72.593594477), (11.910758079, 72.709266295)],
                knots=[0.471095163, 0.471095163, 0.471095163, 0.471095163, 0.5, 0.5, 0.75, 0.75, 0.845573754, 0.845573754, 0.845573754, 0.845573754], degree=3))
            add(Edge.make_bspline(
                [(7.640101966, 76.981602559), (7.268933108, 74.717474641), (6.920624171, 72.427743664), (6.595184696, 70.112410703)],
                knots=[0, 0, 0, 0, 0.415393042, 0.415393042, 0.415393042, 0.415393042], degree=3))
            Line((7.640101966, 76.981602559), (6.653274325, 77.143377733))
            add(Edge.make_bspline(
                [(6.653274325, 77.143377733), (6.017113414, 73.262799802), (5.470323811, 69.283113976)],
                knots=[0, 0, 0, 0.473039412, 0.473039412, 0.473039412], degree=2))
            add(Edge.make_bspline(
                [(-0.55681592, 63.449443524), (1.526985957, 65.831573697), (3.530543581, 67.776669297), (5.470323811, 69.283113976)],
                knots=[0, 0, 0, 0, 0.394380239, 0.394380239, 0.394380239, 0.394380239], degree=3))
            add(Edge.make_bspline(
                [(-6.300362652, 69.65911012), (-5.344610287, 71.20203735), (-4.485476111, 72.527612488), (-2.954275062, 74.750823328), (-2.283718611, 75.647577027), (-1.397510328, 76.688851989), (-1.122134049, 76.985487588), (-0.593101493, 77.486785412), (-0.342250447, 77.692545245), (0.069685616, 77.93818792), (0.213854003, 78.009961095), (0.539343655, 78.11985521), (0.723306406, 78.158644487), (1.032580959, 78.153116796), (1.140675524, 78.140089735), (1.356374269, 78.086021348), (1.463635616, 78.044813802), (1.662514421, 77.938006005), (1.753827868, 77.872701283), (1.912993747, 77.729780548), (1.980991621, 77.652434008), (2.153497129, 77.416663082), (2.227674469, 77.256288431), (2.33565774, 76.942663079), (2.369611431, 76.787611964), (2.440268317, 76.312070013), (2.446396742, 75.978580644), (2.409943474, 75.227364349), (2.365428576, 74.810920821), (2.227966042, 73.879618653), (2.134797262, 73.365159897), (1.782700397, 71.665990726), (1.451087095, 70.325221126), (0.593298433, 67.21168847), (0.067082369, 65.439473727), (-0.55681592, 63.449443524)],
                knots=[0, 0, 0, 0, 0.125, 0.125, 0.25, 0.25, 0.3125, 0.3125, 0.375, 0.375, 0.40625, 0.40625, 0.4375, 0.4375, 0.453125, 0.453125, 0.46875, 0.46875, 0.484375, 0.484375, 0.5, 0.5, 0.53125, 0.53125, 0.5625, 0.5625, 0.625, 0.625, 0.6875, 0.6875, 0.75, 0.75, 0.875, 0.875, 1, 1, 1, 1], degree=3))
            Line((-6.300362652, 69.65911012), (-5.450247201, 69.132513766))
            add(Edge.make_bspline(
                [(-5.450247201, 69.132513766), (7.064304277, 89.335489944), (-3.159968941, 58.662670291)],
                knots=[0, 0, 0, 1, 1, 1], degree=2))
            add(Edge.make_bspline(
                [(-3.159968941, 58.662670291), (1.316464976, 64.542039241), (5.275695334, 67.842094682)],
                knots=[0, 0, 0, 0.452979179, 0.452979179, 0.452979179], degree=2))
            add(Edge.make_bspline(
                [(5.275695334, 67.842094682), (4.780418289, 64.110952406), (4.362996065, 60.29347339)],
                knots=[0.558489513, 0.558489513, 0.558489513, 1, 1, 1], degree=2))
            Line((4.362996065, 60.29347339), (5.35707098, 60.184776273))
            add(Edge.make_bspline(
                [(6.405235456, 68.739030913), (6.022352037, 65.925099747), (5.672958242, 63.0736809), (5.35707098, 60.184776273)],
                knots=[0.497346777, 0.497346777, 0.497346777, 0.497346777, 1, 1, 1, 1], degree=3))
            add(Edge.make_bspline(
                [(6.405235456, 68.739030913), (9.229211771, 70.867966423), (11.779877238, 71.633890502)],
                knots=[0.518208561, 0.518208561, 0.518208561, 0.847496575, 0.847496575, 0.847496575], degree=2))
            add(Edge.make_bspline(
                [(11.779877238, 71.633890502), (11.266423928, 67.563864235), (10.484829594, 63.544236234)],
                knots=[0.453776633, 0.453776633, 0.453776633, 1, 1, 1], degree=2))
            Line((10.484829594, 63.544236234), (11.466444984, 63.353366575))
        make_face()
    extrude(amount=CUT_EXTRUDE_THIN1_DEPTH, mode=Mode.SUBTRACT)

    # Sketch40 → Cut-Extrude18 (cut)
    with BuildSketch(Plane(origin=(19, 0, 0), x_dir=(0, 0, -1), z_dir=(1, 0, 0))):
        with Locations((-48.6, 76.425)):
            Rectangle(SKETCH40_W, SKETCH40_H)
    extrude(amount=-CUT_EXTRUDE18_DEPTH, mode=Mode.SUBTRACT)

    # Sketch41 → Cut-Extrude19 (cut)
    with BuildSketch(Plane(origin=(3, 0, 0), x_dir=(0, 0, -1), z_dir=(1, 0, 0))):
        with Locations((-48.6, 66.925)):
            Rectangle(SKETCH41_W, SKETCH41_H)
    extrude(amount=-CUT_EXTRUDE19_DEPTH, mode=Mode.SUBTRACT)

    # Chamfer2
    chamfer2_edges = [cut_extrude3_piece_1_1.edges().sort_by_distance(p)[0] for p in [
        (19, 76.425, 54.9),
        (19, 64.925, 48.6),
        (19, 76.425, 42.3),
        (19, 87.925, 48.6),
    ]]
    chamfer(chamfer2_edges, length=CHAMFER2_SIZE)


solid = cut_extrude3_piece_1_1.part
